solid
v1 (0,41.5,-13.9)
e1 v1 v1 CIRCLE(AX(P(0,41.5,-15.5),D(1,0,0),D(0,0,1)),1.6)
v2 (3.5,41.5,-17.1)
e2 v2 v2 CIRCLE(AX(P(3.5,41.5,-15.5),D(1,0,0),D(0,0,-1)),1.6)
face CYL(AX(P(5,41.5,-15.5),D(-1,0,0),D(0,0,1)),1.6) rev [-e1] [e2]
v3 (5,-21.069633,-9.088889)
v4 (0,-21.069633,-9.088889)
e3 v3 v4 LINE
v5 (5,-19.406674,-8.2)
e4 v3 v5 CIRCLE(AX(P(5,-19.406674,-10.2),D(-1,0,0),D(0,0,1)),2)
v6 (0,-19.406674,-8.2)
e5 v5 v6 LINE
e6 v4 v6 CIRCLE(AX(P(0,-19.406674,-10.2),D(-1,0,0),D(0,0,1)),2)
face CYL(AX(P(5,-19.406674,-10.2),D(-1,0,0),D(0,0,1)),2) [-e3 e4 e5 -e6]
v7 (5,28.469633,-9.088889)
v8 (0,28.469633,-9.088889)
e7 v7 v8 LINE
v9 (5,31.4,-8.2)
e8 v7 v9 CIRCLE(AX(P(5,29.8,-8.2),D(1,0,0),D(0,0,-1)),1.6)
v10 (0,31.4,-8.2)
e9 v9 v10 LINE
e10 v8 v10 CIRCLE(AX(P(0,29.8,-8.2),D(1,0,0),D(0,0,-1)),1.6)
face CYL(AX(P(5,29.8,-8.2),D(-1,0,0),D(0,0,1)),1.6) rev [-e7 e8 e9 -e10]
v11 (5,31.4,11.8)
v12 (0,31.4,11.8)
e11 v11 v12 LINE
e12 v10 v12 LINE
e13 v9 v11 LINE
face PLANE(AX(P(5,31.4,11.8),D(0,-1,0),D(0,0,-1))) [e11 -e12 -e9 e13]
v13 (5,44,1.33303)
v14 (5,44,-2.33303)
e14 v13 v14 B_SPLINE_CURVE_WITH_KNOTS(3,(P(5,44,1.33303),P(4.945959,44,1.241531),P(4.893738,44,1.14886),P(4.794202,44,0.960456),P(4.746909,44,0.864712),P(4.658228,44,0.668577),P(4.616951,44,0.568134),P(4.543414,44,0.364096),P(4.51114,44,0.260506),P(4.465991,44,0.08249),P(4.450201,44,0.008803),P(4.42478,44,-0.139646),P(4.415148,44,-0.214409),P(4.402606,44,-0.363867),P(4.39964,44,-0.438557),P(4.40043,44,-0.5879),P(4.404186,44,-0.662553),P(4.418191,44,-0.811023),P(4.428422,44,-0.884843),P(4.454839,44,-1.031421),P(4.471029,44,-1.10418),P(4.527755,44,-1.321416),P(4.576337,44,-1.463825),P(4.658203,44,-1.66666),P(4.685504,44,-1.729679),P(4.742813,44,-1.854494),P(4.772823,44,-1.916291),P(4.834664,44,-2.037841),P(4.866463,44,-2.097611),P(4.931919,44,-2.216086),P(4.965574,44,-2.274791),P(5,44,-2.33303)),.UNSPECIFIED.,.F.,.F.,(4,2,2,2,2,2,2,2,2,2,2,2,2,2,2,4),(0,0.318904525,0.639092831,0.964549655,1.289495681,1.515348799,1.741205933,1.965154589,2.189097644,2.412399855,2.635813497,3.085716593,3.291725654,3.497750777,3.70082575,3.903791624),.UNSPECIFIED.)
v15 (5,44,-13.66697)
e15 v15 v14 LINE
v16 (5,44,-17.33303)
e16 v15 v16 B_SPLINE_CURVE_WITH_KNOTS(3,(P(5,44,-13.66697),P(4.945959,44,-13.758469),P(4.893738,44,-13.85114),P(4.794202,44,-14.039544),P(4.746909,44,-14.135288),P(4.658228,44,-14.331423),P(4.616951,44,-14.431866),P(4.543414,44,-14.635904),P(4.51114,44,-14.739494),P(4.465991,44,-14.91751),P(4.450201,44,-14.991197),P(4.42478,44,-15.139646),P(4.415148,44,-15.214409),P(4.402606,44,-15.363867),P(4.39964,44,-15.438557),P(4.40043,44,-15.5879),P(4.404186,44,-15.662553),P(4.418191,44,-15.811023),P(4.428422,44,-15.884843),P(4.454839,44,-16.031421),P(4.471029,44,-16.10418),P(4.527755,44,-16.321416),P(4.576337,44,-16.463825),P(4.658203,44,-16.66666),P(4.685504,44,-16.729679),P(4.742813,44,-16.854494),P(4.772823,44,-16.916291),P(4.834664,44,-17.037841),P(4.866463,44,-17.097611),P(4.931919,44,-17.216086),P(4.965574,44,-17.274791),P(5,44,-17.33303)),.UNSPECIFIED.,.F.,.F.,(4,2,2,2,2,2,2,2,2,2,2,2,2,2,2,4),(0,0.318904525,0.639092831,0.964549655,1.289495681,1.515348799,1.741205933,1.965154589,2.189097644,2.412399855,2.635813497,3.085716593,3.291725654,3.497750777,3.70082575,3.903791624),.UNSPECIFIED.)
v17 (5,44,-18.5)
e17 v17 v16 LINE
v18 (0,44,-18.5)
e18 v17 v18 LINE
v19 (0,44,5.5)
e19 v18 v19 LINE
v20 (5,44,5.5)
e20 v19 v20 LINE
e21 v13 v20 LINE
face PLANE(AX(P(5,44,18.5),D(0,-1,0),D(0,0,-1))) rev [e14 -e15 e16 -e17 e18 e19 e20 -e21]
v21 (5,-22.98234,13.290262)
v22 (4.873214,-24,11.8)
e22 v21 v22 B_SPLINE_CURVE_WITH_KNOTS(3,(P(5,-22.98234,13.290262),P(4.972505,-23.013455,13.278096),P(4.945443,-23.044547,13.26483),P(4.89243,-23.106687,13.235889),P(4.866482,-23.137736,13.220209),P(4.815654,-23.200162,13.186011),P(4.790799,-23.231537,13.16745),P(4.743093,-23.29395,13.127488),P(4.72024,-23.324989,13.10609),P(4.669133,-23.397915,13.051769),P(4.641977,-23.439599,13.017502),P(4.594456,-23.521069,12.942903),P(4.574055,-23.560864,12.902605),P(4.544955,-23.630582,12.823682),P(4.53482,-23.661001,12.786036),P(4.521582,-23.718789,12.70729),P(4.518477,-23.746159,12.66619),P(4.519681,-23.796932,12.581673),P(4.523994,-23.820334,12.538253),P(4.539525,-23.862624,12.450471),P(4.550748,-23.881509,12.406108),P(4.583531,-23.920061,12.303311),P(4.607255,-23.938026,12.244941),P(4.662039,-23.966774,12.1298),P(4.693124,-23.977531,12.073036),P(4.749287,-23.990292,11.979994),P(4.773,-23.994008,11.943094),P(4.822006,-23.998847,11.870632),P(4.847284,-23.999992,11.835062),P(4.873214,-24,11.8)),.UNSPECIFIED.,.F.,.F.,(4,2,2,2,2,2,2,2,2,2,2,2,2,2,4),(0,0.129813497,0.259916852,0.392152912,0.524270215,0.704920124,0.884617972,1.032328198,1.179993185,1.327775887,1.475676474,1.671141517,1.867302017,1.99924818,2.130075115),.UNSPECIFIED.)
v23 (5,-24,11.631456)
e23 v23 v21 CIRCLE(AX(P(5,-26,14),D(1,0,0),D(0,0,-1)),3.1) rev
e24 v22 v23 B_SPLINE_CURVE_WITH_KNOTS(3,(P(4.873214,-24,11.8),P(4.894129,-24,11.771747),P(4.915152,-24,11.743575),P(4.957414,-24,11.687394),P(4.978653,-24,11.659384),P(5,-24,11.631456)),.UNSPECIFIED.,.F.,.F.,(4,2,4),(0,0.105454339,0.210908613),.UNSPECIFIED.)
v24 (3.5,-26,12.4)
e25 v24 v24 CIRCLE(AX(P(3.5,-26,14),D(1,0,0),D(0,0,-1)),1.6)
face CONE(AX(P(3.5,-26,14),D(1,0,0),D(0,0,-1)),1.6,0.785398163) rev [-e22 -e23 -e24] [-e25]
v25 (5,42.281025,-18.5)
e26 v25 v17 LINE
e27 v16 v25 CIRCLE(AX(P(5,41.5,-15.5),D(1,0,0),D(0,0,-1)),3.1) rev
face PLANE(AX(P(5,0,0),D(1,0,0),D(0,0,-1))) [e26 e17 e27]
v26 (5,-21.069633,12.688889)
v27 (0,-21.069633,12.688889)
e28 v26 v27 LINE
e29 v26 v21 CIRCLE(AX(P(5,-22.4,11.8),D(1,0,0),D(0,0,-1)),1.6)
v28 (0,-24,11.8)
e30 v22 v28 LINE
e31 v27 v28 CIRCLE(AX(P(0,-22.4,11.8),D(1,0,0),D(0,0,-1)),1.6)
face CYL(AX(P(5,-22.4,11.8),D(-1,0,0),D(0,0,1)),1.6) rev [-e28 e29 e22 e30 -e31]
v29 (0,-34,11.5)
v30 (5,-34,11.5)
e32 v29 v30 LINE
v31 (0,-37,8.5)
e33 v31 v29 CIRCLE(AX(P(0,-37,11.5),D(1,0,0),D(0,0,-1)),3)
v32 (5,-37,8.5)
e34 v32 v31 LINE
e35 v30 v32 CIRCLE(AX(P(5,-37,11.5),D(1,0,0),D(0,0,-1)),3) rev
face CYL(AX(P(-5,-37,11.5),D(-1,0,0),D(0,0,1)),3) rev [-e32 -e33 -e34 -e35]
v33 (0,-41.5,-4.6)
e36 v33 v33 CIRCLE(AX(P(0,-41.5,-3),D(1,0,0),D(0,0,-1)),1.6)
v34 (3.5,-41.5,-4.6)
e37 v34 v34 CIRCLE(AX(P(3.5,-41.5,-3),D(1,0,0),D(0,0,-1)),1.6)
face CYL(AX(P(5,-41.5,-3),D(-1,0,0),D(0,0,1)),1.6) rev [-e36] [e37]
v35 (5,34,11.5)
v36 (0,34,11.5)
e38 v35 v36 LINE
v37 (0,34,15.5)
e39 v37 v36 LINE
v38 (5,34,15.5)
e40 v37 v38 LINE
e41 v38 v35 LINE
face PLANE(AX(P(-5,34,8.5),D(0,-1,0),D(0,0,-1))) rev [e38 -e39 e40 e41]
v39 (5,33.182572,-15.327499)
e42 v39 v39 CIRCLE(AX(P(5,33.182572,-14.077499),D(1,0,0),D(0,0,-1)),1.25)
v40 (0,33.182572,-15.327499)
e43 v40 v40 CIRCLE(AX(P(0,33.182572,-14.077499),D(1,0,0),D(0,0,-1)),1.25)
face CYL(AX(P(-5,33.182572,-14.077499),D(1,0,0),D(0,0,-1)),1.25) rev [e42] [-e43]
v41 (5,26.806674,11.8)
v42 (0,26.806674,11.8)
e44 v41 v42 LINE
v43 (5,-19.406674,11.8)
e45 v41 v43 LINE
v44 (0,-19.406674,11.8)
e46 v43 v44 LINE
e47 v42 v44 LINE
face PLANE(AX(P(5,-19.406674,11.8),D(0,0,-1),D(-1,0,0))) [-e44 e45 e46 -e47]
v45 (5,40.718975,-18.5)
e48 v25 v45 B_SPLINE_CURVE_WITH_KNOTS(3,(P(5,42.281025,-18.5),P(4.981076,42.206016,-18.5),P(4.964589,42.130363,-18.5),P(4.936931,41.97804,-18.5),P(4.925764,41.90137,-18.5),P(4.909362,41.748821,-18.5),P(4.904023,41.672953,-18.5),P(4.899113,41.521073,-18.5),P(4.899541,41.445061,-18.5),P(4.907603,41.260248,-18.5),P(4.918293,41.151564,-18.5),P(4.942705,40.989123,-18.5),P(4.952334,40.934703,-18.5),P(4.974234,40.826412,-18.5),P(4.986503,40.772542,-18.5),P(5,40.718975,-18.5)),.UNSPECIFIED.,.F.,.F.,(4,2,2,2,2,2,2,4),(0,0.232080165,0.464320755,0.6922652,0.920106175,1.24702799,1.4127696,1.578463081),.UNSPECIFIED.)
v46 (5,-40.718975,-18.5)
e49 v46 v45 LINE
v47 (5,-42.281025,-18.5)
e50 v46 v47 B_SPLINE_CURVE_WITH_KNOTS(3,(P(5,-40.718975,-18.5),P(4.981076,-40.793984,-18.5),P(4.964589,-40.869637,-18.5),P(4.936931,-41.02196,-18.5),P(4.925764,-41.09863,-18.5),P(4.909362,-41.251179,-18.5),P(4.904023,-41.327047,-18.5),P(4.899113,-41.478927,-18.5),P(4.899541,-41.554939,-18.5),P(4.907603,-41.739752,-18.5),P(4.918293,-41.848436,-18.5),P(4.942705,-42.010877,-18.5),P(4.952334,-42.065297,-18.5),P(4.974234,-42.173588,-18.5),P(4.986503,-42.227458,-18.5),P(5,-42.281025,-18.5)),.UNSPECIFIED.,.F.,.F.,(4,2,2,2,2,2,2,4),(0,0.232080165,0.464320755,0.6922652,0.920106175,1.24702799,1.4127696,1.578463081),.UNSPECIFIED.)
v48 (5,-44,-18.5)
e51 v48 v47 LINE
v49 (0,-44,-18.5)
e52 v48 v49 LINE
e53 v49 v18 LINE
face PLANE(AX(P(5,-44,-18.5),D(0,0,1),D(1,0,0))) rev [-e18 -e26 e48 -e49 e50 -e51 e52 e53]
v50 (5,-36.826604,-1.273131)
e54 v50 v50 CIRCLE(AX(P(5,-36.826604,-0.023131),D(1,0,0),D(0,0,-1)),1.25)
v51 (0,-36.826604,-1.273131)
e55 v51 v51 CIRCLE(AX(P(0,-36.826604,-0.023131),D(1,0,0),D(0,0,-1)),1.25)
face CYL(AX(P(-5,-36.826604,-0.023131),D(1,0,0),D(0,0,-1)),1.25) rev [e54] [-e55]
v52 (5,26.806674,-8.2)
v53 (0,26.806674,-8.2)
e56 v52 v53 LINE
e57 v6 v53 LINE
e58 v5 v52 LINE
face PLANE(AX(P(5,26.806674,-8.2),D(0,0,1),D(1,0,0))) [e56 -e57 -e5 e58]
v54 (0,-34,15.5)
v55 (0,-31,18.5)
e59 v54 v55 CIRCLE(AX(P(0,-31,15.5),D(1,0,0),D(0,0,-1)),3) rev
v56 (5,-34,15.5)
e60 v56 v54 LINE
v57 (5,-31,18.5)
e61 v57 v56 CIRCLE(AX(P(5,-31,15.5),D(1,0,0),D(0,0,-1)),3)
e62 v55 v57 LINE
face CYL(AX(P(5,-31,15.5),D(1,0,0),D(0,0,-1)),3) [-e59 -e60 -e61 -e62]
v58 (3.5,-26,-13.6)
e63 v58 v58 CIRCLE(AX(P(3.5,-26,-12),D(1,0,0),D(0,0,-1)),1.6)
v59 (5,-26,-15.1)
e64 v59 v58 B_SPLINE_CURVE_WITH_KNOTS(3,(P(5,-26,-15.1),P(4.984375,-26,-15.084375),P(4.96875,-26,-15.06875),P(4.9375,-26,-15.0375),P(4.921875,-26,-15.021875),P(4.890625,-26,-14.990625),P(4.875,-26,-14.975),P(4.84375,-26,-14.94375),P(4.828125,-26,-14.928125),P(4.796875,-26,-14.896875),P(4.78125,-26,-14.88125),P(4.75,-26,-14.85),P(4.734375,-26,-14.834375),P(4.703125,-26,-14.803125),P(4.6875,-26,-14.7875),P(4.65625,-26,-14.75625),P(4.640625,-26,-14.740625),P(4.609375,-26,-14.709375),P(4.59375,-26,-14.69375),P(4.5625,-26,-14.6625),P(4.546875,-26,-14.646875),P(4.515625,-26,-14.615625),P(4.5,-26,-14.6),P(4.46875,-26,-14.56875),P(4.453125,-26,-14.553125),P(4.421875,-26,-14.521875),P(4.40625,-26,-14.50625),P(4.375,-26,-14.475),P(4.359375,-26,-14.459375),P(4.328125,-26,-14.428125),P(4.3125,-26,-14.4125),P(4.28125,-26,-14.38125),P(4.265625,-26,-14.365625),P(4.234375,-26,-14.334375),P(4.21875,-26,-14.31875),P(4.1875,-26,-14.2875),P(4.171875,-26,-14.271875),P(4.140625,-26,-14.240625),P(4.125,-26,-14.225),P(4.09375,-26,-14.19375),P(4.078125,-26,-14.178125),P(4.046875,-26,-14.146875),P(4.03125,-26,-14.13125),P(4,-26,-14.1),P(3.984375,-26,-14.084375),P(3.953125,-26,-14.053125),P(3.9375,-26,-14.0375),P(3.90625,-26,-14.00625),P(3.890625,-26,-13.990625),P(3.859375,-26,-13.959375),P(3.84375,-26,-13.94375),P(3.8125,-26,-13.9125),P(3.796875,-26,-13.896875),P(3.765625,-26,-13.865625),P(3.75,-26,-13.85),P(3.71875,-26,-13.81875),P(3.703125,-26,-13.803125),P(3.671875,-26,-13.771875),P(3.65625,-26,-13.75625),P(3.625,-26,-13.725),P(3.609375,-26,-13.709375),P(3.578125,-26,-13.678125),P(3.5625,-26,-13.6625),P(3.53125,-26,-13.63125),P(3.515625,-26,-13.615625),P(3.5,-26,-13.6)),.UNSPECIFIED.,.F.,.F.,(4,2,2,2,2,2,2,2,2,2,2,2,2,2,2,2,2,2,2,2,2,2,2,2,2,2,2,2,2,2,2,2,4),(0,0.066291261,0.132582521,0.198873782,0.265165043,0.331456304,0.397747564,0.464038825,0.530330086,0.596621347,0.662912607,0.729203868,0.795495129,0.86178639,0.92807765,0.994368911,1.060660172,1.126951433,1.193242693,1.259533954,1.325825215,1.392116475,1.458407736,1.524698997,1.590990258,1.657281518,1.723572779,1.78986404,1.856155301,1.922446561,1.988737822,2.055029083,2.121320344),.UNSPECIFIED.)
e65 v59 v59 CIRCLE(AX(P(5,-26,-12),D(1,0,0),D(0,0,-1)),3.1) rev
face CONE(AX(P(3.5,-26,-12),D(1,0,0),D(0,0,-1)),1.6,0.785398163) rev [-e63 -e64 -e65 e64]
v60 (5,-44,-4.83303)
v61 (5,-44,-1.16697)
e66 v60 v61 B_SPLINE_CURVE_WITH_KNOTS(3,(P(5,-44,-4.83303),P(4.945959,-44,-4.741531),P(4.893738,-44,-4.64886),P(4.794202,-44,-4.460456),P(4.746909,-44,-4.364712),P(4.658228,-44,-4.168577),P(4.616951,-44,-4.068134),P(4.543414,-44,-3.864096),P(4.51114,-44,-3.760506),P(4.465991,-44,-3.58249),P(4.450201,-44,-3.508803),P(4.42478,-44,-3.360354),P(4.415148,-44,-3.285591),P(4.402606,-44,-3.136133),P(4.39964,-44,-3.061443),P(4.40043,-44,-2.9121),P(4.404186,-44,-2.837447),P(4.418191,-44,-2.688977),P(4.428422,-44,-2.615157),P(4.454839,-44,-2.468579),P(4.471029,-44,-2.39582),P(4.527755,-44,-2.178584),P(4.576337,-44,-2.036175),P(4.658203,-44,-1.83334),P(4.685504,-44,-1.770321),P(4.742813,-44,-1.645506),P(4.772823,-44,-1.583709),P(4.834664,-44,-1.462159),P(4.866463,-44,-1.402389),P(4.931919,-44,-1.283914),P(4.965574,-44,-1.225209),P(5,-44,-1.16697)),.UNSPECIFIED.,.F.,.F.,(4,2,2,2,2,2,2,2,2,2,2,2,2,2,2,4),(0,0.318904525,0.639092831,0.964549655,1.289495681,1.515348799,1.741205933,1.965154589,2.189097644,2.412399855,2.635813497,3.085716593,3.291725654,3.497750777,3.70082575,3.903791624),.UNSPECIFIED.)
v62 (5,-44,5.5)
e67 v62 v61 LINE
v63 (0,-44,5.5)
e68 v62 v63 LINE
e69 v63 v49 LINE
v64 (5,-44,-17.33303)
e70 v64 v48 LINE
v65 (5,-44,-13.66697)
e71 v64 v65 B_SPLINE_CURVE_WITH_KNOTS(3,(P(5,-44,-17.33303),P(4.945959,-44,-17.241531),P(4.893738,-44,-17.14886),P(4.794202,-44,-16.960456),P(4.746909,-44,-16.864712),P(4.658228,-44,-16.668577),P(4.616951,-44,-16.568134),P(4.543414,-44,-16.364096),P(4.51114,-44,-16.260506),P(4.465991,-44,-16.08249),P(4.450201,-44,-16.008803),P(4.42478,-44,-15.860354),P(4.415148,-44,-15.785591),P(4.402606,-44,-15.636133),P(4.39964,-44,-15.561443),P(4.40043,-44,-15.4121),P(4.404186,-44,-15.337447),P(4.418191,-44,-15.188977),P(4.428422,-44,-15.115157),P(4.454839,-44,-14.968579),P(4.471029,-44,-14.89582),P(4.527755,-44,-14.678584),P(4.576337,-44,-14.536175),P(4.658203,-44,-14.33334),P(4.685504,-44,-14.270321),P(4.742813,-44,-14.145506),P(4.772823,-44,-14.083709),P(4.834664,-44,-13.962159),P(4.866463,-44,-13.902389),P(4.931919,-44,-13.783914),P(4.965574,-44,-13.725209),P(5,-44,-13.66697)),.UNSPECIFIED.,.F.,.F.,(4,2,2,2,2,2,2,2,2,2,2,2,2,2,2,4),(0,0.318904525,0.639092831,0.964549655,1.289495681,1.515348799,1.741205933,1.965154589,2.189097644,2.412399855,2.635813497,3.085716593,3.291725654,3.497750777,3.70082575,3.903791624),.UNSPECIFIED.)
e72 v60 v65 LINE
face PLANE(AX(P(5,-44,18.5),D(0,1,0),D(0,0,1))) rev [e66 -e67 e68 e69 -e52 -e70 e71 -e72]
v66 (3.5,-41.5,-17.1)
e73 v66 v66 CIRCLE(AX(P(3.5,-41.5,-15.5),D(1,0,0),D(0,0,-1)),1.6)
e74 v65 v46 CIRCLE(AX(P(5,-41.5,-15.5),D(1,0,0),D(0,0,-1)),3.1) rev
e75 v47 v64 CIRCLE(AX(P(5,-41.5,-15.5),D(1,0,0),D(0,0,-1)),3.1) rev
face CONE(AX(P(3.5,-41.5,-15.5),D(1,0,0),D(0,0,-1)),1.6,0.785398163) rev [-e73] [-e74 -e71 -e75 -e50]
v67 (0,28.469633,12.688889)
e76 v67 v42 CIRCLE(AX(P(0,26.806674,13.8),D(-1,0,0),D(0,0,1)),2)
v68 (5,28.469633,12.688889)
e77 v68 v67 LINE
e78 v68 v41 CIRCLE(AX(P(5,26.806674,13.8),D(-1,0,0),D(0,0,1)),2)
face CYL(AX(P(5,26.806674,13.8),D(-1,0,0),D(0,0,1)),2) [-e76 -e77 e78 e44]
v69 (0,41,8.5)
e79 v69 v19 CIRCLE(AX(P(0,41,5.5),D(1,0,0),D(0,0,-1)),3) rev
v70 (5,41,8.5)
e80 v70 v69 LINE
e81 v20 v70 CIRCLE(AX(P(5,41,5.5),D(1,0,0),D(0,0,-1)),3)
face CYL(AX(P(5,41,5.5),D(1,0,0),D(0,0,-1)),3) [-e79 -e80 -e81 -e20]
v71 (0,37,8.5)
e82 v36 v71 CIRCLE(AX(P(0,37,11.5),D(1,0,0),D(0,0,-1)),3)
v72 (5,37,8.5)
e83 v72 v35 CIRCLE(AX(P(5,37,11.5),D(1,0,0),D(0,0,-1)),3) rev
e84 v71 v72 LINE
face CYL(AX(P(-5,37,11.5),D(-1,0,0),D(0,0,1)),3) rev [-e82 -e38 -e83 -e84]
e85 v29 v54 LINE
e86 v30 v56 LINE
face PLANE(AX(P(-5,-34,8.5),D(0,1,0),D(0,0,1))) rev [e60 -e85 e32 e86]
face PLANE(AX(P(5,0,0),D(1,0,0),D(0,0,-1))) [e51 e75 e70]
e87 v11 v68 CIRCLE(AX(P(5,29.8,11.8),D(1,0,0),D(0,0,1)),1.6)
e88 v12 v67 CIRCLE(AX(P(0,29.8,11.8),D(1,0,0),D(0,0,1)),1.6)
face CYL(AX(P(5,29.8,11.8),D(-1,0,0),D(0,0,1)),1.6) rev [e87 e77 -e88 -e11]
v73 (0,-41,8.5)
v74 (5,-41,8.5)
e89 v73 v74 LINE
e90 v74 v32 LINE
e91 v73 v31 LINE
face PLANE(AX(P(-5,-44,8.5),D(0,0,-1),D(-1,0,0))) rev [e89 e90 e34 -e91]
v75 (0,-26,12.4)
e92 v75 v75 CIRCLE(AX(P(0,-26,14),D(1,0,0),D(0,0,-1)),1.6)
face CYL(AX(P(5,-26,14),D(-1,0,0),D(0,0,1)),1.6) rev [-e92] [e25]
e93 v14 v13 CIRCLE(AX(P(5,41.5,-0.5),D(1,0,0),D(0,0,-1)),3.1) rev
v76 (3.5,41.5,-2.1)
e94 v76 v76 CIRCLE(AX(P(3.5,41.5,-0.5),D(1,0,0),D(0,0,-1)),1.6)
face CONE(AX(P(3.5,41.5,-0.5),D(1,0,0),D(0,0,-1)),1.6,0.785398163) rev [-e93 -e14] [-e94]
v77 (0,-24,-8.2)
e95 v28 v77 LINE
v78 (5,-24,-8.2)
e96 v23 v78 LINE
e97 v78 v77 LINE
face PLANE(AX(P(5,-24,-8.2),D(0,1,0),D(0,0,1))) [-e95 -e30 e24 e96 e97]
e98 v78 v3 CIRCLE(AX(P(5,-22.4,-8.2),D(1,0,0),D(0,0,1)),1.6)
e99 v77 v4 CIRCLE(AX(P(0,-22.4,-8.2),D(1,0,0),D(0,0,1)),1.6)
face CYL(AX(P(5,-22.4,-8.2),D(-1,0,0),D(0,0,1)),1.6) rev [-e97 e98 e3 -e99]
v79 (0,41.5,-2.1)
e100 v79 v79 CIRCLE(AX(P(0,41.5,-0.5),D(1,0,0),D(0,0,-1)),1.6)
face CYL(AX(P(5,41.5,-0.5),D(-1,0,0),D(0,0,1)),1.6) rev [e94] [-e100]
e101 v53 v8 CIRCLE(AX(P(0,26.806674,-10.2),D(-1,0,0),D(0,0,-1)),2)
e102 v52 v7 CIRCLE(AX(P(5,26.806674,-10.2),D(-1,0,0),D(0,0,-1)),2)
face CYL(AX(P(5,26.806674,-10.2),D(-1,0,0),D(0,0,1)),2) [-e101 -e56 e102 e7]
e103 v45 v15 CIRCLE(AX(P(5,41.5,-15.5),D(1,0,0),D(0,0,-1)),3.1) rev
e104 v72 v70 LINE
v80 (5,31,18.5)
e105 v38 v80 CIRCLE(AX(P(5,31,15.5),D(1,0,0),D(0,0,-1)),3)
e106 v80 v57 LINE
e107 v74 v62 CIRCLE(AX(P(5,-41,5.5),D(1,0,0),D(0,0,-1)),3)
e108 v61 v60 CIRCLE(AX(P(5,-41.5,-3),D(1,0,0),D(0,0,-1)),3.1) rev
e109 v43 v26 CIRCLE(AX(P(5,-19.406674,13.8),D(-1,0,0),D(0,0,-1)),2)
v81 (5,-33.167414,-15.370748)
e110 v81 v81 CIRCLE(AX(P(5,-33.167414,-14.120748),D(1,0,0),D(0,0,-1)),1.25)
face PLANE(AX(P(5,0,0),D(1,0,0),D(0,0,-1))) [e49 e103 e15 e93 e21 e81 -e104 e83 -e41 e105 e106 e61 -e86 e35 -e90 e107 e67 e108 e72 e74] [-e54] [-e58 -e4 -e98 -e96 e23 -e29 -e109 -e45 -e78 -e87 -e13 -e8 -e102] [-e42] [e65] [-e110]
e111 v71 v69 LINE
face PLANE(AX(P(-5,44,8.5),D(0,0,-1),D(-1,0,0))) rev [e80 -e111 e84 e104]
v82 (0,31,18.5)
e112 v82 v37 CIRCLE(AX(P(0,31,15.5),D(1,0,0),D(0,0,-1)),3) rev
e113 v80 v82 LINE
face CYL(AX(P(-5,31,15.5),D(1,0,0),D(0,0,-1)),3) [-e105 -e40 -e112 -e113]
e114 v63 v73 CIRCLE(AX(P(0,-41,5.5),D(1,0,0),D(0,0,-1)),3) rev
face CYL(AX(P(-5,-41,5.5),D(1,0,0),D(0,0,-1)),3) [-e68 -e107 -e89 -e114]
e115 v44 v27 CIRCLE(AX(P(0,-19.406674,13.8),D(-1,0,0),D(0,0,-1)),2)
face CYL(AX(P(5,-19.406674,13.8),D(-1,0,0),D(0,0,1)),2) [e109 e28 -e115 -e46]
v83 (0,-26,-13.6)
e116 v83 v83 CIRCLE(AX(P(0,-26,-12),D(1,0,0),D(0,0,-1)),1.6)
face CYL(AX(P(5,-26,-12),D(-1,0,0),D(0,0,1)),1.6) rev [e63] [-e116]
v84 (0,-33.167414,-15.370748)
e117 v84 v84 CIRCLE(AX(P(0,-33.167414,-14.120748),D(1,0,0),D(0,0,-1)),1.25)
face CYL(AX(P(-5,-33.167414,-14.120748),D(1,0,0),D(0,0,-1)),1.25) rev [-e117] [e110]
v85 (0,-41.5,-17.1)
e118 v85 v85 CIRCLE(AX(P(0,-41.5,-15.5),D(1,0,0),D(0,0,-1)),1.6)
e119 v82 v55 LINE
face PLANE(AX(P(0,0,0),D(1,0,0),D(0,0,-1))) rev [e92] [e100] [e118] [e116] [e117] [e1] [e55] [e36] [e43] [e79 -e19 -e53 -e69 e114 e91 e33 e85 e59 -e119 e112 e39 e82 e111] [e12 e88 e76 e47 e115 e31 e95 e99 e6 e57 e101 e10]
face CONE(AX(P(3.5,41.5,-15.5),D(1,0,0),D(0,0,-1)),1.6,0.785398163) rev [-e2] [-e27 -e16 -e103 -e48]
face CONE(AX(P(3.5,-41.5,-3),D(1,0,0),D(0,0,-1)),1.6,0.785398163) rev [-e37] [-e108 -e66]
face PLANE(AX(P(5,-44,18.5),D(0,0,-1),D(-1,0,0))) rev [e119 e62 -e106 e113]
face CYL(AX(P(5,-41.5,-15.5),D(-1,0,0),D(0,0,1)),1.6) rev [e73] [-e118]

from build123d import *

# Parameters (mm, degrees)
SKETCH1_W           = 88
SKETCH1_H           = 37
SKETCH1_R           = 1.6
BOSS_EXTRUDE1_DEPTH = 5
FILLET1_R           = 5
CHAMFER2_SIZE       = 1.5
SKETCH2_R           = 1.25
CUT_EXTRUDE1_DEPTH  = 10
SKETCH3_W           = 10
SKETCH3_H           = 10
CUT_EXTRUDE2_DEPTH  = 10
FILLET2_R           = 3


with BuildPart() as part:
    # Sketch1 → Boss-Extrude1 (new body)
    with BuildSketch(Plane.YZ):
        Rectangle(SKETCH1_W, SKETCH1_H)
        with Locations(Location((-41.5, -15.5, 0), (0, 0, 270))):
            Circle(SKETCH1_R, mode=Mode.SUBTRACT)
        with Locations(Location((-41.5, -3, 0), (0, 0, 270))):
            Circle(SKETCH1_R, mode=Mode.SUBTRACT)
        with Locations(Location((41.5, -15.5, 0), (0, 0, 90))):
            Circle(SKETCH1_R, mode=Mode.SUBTRACT)
        with Locations(Location((-26, 14, 0), (0, 0, 270))):
            Circle(SKETCH1_R, mode=Mode.SUBTRACT)
        with Locations(Location((-26, -12, 0), (0, 0, 270))):
            Circle(SKETCH1_R, mode=Mode.SUBTRACT)
        with Locations(Location((41.5, -0.5, 0), (0, 0, 270))):
            Circle(SKETCH1_R, mode=Mode.SUBTRACT)
        with BuildLine():
            Line((-24, -8.2), (-24, 11.8))
            ThreePointArc((-24, 11.8), (-22.86444197, 13.331108636), (-21.069632929, 12.688888889))
            ThreePointArc((-21.069632929, 12.688888889), (-20.349483132, 12.036165793), (-19.406674091, 11.8))
            Line((-19.406674091, 11.8), (26.806674091, 11.8))
            ThreePointArc((26.806674091, 11.8), (27.749483132, 12.036165793), (28.469632929, 12.688888889))
            ThreePointArc((28.469632929, 12.688888889), (30.26444197, 13.331108636), (31.4, 11.8))
            Line((31.4, 11.8), (31.4, -8.2))
            ThreePointArc((31.4, -8.2), (30.26444197, -9.731108636), (28.469632929, -9.088888889))
            ThreePointArc((28.469632929, -9.088888889), (27.749483132, -8.436165793), (26.806674091, -8.2))
            Line((26.806674091, -8.2), (-19.406674091, -8.2))
            ThreePointArc((-19.406674091, -8.2), (-20.349483132, -8.436165793), (-21.069632929, -9.088888889))
            ThreePointArc((-21.069632929, -9.088888889), (-22.86444197, -9.731108636), (-24, -8.2))
        make_face(mode=Mode.SUBTRACT)
    extrude(amount=BOSS_EXTRUDE1_DEPTH)

    # Fillet1
    fillet1_edges = [part.edges().sort_by_distance(p)[0] for p in [
        (2.5, -44, 18.5),
        (2.5, 44, 18.5),
    ]]
    fillet(fillet1_edges, radius=FILLET1_R)

    # Chamfer2
    # the kernel refuses this chamfer: 1.5 mm, written as the material it takes off along each edge
    with BuildSketch(Plane(origin=(5, -41.5, -15.5), x_dir=(0, 0, -1), z_dir=(0, -1, 0))) as chamfer2_piece_1:
        Polygon((1.6 + CHAMFER2_SIZE, 0), (1.6, -CHAMFER2_SIZE), (1.6, 0), align=None)
    revolve(axis=Axis((5, -41.5, -15.5), (1, 0, 0)), mode=Mode.SUBTRACT)
    with BuildSketch(Plane(origin=(5, -41.5, -3), x_dir=(0, 0, -1), z_dir=(0, -1, 0))) as chamfer2_piece_2:
        Polygon((1.6 + CHAMFER2_SIZE, 0), (1.6, -CHAMFER2_SIZE), (1.6, 0), align=None)
    revolve(axis=Axis((5, -41.5, -3), (1, 0, 0)), mode=Mode.SUBTRACT)
    with BuildSketch(Plane(origin=(5, 41.5, -0.5), x_dir=(0, 0, -1), z_dir=(0, -1, 0))) as chamfer2_piece_3:
        Polygon((1.6 + CHAMFER2_SIZE, 0), (1.6, -CHAMFER2_SIZE), (1.6, 0), align=None)
    revolve(axis=Axis((5, 41.5, -0.5), (1, 0, 0)), mode=Mode.SUBTRACT)
    with BuildSketch(Plane(origin=(5, 41.5, -15.5), x_dir=(0, 0, 1), z_dir=(0, 1, 0))) as chamfer2_piece_4:
        Polygon((1.6 + CHAMFER2_SIZE, 0), (1.6, -CHAMFER2_SIZE), (1.6, 0), align=None)
    revolve(axis=Axis((5, 41.5, -15.5), (1, 0, 0)), mode=Mode.SUBTRACT)
    with BuildSketch(Plane(origin=(5, -26, 14), x_dir=(0, 0, -1), z_dir=(0, -1, 0))) as chamfer2_piece_5:
        Polygon((1.6 + CHAMFER2_SIZE, 0), (1.6, -CHAMFER2_SIZE), (1.6, 0), align=None)
    revolve(axis=Axis((5, -26, 14), (1, 0, 0)), mode=Mode.SUBTRACT)
    with BuildSketch(Plane(origin=(5, -26, -12), x_dir=(0, 0, -1), z_dir=(0, -1, 0))) as chamfer2_piece_6:
        Polygon((1.6 + CHAMFER2_SIZE, 0), (1.6, -CHAMFER2_SIZE), (1.6, 0), align=None)
    revolve(axis=Axis((5, -26, -12), (1, 0, 0)), mode=Mode.SUBTRACT)

    # Sketch2 → Cut-Extrude1 (cut)
    with BuildSketch(Plane.YZ.offset(5)):
        with Locations(Location((-36.826603685, -0.023130638, 0), (0, 0, 270))):
            Circle(SKETCH2_R)
        with Locations(Location((-33.167413509, -14.120748425, 0), (0, 0, 270))):
            Circle(SKETCH2_R)
        with Locations(Location((33.182572395, -14.077498807, 0), (0, 0, 270))):
            Circle(SKETCH2_R)
    extrude(amount=-CUT_EXTRUDE1_DEPTH, mode=Mode.SUBTRACT)

    # Sketch3 → Cut-Extrude2 (cut)
    with BuildSketch(Plane.YZ.offset(5)):
        with Locations((-39, 13.5)):
            Rectangle(SKETCH3_W, SKETCH3_H)
        with Locations((39, 13.5)):
            Rectangle(SKETCH3_W, SKETCH3_H)
    extrude(amount=-CUT_EXTRUDE2_DEPTH, mode=Mode.SUBTRACT)

    # Fillet2
    fillet2_edges = [part.edges().sort_by_distance(p)[0] for p in [
        (2.5, -34, 18.5),
        (2.5, -34, 8.5),
        (2.5, -44, 8.5),
        (2.5, 44, 8.5),
        (2.5, 34, 8.5),
        (2.5, 34, 18.5),
    ]]
    fillet(fillet2_edges, radius=FILLET2_R)


solid = part.part
